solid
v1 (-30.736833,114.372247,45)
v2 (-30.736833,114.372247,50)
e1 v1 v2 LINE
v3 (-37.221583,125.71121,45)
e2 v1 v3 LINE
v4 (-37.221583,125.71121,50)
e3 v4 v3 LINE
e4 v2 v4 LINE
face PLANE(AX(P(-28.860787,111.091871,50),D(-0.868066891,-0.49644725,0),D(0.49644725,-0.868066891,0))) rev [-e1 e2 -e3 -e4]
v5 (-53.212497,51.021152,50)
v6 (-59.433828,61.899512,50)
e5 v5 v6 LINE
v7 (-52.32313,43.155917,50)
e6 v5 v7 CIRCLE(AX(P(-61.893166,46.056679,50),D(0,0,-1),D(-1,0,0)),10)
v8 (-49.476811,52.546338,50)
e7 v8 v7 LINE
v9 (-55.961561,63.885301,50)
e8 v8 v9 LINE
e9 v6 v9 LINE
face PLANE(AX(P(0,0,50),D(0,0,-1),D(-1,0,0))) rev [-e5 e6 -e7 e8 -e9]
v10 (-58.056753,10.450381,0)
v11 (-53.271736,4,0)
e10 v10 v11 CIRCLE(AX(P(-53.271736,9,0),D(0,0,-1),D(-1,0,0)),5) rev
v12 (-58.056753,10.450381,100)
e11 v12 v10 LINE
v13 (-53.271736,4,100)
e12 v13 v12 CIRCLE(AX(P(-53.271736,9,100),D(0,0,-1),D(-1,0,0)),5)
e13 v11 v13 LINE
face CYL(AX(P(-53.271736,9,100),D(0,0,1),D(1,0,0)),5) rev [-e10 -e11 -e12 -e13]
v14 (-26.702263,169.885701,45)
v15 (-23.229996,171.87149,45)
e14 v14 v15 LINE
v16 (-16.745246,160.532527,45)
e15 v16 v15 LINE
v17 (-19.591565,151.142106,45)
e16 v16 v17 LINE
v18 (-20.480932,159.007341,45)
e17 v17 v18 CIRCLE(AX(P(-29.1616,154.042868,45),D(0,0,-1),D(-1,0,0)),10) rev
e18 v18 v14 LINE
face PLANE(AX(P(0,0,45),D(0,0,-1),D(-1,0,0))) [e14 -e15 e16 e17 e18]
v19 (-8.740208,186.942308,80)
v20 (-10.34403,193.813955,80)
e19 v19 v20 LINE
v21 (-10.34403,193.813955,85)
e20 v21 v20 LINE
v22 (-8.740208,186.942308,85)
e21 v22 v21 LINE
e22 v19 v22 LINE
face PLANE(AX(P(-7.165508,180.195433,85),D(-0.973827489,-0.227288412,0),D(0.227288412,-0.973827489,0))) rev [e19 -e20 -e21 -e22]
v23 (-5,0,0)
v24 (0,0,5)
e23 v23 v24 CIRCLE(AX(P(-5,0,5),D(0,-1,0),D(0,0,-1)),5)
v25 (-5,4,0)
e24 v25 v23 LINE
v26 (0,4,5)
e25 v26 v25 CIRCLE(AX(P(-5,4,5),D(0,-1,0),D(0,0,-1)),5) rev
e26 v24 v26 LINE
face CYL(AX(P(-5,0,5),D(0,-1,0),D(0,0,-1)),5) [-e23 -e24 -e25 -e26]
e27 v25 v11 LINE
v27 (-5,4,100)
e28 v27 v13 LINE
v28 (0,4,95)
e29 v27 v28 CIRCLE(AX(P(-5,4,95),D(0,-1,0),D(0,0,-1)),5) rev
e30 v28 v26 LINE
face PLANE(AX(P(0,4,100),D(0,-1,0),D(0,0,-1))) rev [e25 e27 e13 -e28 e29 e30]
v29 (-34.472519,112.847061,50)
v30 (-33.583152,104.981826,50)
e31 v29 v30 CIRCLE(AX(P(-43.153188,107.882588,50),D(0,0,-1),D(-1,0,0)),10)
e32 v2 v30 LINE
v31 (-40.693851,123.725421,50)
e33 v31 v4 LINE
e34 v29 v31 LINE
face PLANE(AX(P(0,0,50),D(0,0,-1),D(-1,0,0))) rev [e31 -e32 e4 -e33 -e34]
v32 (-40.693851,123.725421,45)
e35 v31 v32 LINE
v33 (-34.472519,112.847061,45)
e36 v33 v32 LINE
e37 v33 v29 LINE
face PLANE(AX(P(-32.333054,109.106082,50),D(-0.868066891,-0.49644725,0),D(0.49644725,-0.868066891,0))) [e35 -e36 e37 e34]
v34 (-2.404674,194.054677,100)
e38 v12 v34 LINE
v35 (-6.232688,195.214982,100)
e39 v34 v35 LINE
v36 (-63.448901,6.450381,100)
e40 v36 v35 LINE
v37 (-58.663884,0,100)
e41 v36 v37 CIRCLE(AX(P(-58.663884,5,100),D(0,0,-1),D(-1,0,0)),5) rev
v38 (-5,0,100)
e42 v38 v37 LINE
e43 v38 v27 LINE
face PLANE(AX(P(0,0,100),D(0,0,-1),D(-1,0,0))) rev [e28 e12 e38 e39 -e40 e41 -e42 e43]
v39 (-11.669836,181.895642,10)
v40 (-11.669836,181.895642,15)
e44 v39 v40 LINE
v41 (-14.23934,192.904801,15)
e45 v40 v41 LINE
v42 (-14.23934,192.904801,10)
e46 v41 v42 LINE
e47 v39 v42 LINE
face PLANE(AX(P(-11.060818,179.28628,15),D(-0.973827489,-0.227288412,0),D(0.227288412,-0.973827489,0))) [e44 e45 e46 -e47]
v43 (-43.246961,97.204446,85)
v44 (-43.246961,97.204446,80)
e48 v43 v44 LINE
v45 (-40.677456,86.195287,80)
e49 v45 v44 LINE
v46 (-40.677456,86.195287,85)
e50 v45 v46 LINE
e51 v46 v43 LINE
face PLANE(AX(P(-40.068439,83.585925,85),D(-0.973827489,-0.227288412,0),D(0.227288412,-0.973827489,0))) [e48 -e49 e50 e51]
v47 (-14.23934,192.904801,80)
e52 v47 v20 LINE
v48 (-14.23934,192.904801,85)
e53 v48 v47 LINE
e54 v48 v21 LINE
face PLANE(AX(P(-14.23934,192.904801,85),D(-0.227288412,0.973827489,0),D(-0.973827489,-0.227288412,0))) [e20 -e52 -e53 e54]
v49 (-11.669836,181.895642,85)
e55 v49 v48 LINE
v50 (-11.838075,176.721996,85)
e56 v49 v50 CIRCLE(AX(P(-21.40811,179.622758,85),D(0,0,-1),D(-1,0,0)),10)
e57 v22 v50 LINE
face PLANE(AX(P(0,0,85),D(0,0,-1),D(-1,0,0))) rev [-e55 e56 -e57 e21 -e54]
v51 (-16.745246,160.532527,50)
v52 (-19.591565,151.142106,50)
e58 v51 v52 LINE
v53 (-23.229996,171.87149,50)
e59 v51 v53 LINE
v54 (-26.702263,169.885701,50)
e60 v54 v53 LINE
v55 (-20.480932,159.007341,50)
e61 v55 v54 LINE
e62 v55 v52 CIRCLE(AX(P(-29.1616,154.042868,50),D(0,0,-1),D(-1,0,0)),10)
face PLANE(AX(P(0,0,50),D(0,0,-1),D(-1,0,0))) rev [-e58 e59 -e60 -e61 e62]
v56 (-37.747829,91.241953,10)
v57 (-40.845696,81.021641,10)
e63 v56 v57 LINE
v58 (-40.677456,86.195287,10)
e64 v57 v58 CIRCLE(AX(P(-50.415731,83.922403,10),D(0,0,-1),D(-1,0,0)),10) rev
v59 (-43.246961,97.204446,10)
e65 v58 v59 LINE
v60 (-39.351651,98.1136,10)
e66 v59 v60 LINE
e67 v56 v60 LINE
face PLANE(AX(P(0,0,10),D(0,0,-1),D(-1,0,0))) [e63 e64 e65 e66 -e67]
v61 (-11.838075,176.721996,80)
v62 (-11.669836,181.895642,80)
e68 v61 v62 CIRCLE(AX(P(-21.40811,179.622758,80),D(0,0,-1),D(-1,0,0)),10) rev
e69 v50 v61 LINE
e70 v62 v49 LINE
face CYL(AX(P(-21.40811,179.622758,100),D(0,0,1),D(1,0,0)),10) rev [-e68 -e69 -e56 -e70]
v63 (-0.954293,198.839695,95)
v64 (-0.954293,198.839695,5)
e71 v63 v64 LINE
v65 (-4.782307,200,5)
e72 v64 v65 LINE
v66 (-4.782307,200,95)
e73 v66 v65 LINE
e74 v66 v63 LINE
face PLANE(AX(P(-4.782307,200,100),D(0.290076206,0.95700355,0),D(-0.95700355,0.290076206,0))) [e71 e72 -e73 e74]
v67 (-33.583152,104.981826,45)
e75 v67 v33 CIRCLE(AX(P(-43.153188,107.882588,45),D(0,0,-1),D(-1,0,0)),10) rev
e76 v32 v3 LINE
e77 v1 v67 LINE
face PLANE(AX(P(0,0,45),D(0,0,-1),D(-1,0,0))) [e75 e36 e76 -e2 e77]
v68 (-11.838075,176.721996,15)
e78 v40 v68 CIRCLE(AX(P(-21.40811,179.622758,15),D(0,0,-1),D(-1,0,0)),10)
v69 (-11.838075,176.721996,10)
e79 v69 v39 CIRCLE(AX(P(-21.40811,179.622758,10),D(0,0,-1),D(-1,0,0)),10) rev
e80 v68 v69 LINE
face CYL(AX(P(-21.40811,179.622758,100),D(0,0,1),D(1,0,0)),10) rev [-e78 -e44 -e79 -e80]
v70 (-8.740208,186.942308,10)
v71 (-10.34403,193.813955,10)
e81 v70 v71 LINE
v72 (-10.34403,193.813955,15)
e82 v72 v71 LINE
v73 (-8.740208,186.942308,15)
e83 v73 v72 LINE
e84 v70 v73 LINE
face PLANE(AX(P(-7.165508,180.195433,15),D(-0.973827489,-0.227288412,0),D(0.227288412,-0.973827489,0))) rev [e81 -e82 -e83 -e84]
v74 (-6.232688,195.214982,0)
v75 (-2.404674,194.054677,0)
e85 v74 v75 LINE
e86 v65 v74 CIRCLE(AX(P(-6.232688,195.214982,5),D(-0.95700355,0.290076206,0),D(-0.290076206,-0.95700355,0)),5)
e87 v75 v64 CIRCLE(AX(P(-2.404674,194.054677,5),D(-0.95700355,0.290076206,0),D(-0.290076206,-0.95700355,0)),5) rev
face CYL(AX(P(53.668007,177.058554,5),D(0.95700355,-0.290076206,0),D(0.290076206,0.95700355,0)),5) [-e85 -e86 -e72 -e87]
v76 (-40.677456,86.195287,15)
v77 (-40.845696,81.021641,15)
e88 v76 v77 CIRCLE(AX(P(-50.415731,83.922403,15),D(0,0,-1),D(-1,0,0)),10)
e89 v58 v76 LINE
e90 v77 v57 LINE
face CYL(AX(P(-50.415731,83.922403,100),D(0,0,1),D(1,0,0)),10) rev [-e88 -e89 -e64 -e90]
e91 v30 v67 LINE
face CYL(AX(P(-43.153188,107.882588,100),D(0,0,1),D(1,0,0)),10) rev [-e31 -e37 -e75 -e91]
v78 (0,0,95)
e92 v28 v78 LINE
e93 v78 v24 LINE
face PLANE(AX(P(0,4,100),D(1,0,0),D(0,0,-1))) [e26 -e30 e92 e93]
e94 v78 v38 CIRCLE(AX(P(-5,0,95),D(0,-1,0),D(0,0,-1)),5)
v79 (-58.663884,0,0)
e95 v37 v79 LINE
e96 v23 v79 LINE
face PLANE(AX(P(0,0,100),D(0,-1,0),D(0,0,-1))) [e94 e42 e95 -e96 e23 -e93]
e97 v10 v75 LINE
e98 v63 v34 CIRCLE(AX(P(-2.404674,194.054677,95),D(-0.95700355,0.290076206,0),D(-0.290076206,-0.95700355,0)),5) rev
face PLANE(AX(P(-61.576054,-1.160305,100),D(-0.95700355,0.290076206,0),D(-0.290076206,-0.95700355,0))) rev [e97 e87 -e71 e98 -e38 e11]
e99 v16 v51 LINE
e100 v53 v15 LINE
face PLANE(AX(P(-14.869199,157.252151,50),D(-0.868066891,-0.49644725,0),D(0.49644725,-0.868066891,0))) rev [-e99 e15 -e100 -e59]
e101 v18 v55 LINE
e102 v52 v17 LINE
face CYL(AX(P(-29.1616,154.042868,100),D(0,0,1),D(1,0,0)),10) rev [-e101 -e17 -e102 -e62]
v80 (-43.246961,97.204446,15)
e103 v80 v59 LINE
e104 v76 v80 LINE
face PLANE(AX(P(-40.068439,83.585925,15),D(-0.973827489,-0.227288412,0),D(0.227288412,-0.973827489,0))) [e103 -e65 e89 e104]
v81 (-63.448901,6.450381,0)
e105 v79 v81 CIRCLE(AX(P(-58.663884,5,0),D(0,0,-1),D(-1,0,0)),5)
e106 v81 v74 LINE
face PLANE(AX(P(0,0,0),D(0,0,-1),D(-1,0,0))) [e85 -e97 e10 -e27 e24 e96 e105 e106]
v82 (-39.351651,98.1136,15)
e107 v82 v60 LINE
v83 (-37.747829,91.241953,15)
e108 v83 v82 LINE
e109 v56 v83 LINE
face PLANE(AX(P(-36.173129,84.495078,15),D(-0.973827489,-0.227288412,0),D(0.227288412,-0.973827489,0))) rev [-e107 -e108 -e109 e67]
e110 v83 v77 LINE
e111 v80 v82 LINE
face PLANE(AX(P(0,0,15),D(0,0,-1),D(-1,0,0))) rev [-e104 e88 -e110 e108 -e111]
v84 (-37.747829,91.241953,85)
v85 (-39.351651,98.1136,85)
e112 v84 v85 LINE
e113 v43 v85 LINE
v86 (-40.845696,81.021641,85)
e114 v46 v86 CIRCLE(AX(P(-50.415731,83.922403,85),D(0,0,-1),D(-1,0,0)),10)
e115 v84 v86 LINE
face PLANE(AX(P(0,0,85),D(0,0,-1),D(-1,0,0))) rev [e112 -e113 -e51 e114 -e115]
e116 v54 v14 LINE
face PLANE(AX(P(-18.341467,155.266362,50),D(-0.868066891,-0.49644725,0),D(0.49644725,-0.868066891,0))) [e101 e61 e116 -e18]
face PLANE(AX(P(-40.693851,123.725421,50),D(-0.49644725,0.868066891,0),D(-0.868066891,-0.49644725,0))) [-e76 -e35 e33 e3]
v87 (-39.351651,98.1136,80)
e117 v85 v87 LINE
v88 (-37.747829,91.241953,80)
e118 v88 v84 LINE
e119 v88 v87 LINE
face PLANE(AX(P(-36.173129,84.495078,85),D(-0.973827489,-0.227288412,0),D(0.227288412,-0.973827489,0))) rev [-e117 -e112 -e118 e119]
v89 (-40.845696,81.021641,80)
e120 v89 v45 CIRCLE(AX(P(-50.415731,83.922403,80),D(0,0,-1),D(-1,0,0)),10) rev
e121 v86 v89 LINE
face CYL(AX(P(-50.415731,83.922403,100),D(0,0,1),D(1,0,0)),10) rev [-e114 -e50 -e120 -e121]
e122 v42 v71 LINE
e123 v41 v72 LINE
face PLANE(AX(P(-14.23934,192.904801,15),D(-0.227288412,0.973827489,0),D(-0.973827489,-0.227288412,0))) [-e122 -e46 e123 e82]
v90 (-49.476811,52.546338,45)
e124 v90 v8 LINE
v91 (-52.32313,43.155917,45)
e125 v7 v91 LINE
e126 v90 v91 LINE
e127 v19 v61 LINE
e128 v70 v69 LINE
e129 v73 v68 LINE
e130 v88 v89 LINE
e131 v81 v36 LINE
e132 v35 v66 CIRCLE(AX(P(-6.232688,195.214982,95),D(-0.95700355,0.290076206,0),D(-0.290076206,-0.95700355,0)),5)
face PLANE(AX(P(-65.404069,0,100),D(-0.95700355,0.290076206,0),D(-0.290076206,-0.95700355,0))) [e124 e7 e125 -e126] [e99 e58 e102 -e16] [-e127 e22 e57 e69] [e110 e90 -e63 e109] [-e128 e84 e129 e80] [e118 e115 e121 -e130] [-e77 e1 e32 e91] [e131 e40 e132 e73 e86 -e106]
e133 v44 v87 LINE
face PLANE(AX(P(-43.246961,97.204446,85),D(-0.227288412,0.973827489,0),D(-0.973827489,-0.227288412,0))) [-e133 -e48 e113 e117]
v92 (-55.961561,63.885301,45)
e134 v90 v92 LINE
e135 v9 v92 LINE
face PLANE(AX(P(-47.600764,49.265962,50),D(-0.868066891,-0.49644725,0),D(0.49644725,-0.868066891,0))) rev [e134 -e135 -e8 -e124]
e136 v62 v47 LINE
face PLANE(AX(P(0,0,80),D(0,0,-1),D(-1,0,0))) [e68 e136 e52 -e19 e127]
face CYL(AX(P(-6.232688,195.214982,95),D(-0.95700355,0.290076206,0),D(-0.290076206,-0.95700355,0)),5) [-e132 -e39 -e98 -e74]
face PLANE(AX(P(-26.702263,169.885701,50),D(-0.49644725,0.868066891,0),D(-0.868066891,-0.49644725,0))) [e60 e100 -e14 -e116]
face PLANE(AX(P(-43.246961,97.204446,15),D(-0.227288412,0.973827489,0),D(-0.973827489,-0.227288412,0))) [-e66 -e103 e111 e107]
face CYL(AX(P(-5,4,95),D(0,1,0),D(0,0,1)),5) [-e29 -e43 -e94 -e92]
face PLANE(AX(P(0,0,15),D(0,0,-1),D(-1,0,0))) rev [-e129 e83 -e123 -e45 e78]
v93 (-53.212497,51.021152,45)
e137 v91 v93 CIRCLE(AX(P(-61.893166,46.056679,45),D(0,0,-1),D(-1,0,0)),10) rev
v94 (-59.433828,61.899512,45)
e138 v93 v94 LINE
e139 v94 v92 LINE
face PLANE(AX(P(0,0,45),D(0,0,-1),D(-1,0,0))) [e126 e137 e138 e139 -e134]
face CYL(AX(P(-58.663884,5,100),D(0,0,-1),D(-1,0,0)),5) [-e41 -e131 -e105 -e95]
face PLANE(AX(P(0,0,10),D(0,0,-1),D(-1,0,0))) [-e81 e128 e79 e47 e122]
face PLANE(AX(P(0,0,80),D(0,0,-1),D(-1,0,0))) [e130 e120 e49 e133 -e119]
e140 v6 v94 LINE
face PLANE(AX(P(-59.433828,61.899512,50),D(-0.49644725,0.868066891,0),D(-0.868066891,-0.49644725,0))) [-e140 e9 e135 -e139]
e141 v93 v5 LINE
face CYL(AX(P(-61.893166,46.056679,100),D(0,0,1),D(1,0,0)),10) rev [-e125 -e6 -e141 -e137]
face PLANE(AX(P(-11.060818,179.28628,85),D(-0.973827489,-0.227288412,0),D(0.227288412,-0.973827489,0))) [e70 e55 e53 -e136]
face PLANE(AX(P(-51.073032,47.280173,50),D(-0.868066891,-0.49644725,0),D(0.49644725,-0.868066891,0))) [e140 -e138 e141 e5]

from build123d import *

# Parameters (mm, degrees)
EXTRU_MINCE1_DEPTH         = 100
EXTRU_MINCE2_DEPTH         = 5
EXTRU_MINCE3_DEPTH         = 5
CONG_1_R                   = 10
R_P_TITION_START           = 80
R_P_TITION_LIN_AIRE1_DEPTH = 5
CONG_2_R                   = 5


# Read off the part's stored shape, not the designer's step: Répétition linéaire1
with BuildPart() as part:
    # Esquisse1 → Extru.-Mince1 (new body)
    with BuildSketch(Plane.XY):
        Polygon((0, 0), (-65.404068622, 0), (-4.782306964, 200), (-0.954292763, 198.839695178), (-60.011920576, 4), (0, 4), align=None)
    extrude(amount=EXTRU_MINCE1_DEPTH)

    # Esquisse2 → Extru.-Mince2 (add)
    with BuildSketch(Plane.XY.offset(10)):
        Polygon((-11.060818094, 179.286279518), (-14.23934022, 192.904801434), (-10.344030265, 193.813955082), (-7.16550814, 180.195433166), align=None)
        Polygon((-40.068438655, 83.585924506), (-43.246960781, 97.204446422), (-39.351650826, 98.11360007), (-36.1731287, 84.495078154), align=None)
    extrude(amount=EXTRU_MINCE2_DEPTH)

    # Esquisse3 → Extru.-Mince3 (add)
    with BuildSketch(Plane.XY.offset(45)):
        Polygon((-18.341466727, 155.266361808), (-26.702263311, 169.885700914), (-23.229995746, 171.871489915), (-14.869199162, 157.252150809), align=None)
        Polygon((-32.333054107, 109.106082076), (-40.693850691, 123.725421182), (-37.221583126, 125.711210183), (-28.860786542, 111.091871077), align=None)
        Polygon((-51.073031786, 47.280172809), (-59.433828371, 61.899511915), (-55.961560806, 63.885300916), (-47.600764221, 49.26596181), align=None)
    extrude(amount=EXTRU_MINCE3_DEPTH)

    # Congé1
    cong_1_edges = [part.edges().sort_by_distance(p)[0] for p in [
        (-11.060818094, 179.286279518, 12.5),
        (-40.068438655, 83.585924506, 12.5),
        (-18.341466727, 155.266361808, 47.5),
        (-32.333054107, 109.106082076, 47.5),
        (-51.073031786, 47.280172809, 47.5),
    ]]
    fillet(cong_1_edges, radius=CONG_1_R)

    # Répétition linéaire1 outline → Répétition linéaire1 (add)
    with BuildSketch(Plane.XY.offset(R_P_TITION_START)):
        with BuildLine():
            Line((-40.845695505, 81.021641222), (-37.74782901, 91.241952907))
            Line((-37.74782901, 91.241952907), (-39.351650826, 98.11360007))
            Line((-39.351650826, 98.11360007), (-43.246960781, 97.204446422))
            Line((-43.246960781, 97.204446422), (-40.677456119, 86.195287398))
            ThreePointArc((-40.677456119, 86.195287398), (-40.421014092, 83.597389742), (-40.845695505, 81.021641222))
        make_face()
        with BuildLine():
            Line((-8.74020845, 186.942307919), (-10.344030265, 193.813955082))
            Line((-10.344030265, 193.813955082), (-14.23934022, 192.904801434))
            Line((-14.23934022, 192.904801434), (-11.669835559, 181.89564241))
            ThreePointArc((-11.669835559, 181.89564241), (-11.413393531, 179.297744754), (-11.838074945, 176.721996234))
            Line((-11.838074945, 176.721996234), (-8.74020845, 186.942307919))
        make_face()
    extrude(amount=R_P_TITION_LIN_AIRE1_DEPTH)

    # Congé2
    cong_2_edges = [part.edges().sort_by_distance(p)[0] for p in [
        (0, 2, 100),
        (0, 2, 0),
        (-2.868299864, 199.419847589, 0),
        (-2.868299864, 199.419847589, 100),
        (-60.011920576, 4, 50),
        (-65.404068622, 0, 50),
    ]]
    fillet(cong_2_edges, radius=CONG_2_R)


solid = part.part
